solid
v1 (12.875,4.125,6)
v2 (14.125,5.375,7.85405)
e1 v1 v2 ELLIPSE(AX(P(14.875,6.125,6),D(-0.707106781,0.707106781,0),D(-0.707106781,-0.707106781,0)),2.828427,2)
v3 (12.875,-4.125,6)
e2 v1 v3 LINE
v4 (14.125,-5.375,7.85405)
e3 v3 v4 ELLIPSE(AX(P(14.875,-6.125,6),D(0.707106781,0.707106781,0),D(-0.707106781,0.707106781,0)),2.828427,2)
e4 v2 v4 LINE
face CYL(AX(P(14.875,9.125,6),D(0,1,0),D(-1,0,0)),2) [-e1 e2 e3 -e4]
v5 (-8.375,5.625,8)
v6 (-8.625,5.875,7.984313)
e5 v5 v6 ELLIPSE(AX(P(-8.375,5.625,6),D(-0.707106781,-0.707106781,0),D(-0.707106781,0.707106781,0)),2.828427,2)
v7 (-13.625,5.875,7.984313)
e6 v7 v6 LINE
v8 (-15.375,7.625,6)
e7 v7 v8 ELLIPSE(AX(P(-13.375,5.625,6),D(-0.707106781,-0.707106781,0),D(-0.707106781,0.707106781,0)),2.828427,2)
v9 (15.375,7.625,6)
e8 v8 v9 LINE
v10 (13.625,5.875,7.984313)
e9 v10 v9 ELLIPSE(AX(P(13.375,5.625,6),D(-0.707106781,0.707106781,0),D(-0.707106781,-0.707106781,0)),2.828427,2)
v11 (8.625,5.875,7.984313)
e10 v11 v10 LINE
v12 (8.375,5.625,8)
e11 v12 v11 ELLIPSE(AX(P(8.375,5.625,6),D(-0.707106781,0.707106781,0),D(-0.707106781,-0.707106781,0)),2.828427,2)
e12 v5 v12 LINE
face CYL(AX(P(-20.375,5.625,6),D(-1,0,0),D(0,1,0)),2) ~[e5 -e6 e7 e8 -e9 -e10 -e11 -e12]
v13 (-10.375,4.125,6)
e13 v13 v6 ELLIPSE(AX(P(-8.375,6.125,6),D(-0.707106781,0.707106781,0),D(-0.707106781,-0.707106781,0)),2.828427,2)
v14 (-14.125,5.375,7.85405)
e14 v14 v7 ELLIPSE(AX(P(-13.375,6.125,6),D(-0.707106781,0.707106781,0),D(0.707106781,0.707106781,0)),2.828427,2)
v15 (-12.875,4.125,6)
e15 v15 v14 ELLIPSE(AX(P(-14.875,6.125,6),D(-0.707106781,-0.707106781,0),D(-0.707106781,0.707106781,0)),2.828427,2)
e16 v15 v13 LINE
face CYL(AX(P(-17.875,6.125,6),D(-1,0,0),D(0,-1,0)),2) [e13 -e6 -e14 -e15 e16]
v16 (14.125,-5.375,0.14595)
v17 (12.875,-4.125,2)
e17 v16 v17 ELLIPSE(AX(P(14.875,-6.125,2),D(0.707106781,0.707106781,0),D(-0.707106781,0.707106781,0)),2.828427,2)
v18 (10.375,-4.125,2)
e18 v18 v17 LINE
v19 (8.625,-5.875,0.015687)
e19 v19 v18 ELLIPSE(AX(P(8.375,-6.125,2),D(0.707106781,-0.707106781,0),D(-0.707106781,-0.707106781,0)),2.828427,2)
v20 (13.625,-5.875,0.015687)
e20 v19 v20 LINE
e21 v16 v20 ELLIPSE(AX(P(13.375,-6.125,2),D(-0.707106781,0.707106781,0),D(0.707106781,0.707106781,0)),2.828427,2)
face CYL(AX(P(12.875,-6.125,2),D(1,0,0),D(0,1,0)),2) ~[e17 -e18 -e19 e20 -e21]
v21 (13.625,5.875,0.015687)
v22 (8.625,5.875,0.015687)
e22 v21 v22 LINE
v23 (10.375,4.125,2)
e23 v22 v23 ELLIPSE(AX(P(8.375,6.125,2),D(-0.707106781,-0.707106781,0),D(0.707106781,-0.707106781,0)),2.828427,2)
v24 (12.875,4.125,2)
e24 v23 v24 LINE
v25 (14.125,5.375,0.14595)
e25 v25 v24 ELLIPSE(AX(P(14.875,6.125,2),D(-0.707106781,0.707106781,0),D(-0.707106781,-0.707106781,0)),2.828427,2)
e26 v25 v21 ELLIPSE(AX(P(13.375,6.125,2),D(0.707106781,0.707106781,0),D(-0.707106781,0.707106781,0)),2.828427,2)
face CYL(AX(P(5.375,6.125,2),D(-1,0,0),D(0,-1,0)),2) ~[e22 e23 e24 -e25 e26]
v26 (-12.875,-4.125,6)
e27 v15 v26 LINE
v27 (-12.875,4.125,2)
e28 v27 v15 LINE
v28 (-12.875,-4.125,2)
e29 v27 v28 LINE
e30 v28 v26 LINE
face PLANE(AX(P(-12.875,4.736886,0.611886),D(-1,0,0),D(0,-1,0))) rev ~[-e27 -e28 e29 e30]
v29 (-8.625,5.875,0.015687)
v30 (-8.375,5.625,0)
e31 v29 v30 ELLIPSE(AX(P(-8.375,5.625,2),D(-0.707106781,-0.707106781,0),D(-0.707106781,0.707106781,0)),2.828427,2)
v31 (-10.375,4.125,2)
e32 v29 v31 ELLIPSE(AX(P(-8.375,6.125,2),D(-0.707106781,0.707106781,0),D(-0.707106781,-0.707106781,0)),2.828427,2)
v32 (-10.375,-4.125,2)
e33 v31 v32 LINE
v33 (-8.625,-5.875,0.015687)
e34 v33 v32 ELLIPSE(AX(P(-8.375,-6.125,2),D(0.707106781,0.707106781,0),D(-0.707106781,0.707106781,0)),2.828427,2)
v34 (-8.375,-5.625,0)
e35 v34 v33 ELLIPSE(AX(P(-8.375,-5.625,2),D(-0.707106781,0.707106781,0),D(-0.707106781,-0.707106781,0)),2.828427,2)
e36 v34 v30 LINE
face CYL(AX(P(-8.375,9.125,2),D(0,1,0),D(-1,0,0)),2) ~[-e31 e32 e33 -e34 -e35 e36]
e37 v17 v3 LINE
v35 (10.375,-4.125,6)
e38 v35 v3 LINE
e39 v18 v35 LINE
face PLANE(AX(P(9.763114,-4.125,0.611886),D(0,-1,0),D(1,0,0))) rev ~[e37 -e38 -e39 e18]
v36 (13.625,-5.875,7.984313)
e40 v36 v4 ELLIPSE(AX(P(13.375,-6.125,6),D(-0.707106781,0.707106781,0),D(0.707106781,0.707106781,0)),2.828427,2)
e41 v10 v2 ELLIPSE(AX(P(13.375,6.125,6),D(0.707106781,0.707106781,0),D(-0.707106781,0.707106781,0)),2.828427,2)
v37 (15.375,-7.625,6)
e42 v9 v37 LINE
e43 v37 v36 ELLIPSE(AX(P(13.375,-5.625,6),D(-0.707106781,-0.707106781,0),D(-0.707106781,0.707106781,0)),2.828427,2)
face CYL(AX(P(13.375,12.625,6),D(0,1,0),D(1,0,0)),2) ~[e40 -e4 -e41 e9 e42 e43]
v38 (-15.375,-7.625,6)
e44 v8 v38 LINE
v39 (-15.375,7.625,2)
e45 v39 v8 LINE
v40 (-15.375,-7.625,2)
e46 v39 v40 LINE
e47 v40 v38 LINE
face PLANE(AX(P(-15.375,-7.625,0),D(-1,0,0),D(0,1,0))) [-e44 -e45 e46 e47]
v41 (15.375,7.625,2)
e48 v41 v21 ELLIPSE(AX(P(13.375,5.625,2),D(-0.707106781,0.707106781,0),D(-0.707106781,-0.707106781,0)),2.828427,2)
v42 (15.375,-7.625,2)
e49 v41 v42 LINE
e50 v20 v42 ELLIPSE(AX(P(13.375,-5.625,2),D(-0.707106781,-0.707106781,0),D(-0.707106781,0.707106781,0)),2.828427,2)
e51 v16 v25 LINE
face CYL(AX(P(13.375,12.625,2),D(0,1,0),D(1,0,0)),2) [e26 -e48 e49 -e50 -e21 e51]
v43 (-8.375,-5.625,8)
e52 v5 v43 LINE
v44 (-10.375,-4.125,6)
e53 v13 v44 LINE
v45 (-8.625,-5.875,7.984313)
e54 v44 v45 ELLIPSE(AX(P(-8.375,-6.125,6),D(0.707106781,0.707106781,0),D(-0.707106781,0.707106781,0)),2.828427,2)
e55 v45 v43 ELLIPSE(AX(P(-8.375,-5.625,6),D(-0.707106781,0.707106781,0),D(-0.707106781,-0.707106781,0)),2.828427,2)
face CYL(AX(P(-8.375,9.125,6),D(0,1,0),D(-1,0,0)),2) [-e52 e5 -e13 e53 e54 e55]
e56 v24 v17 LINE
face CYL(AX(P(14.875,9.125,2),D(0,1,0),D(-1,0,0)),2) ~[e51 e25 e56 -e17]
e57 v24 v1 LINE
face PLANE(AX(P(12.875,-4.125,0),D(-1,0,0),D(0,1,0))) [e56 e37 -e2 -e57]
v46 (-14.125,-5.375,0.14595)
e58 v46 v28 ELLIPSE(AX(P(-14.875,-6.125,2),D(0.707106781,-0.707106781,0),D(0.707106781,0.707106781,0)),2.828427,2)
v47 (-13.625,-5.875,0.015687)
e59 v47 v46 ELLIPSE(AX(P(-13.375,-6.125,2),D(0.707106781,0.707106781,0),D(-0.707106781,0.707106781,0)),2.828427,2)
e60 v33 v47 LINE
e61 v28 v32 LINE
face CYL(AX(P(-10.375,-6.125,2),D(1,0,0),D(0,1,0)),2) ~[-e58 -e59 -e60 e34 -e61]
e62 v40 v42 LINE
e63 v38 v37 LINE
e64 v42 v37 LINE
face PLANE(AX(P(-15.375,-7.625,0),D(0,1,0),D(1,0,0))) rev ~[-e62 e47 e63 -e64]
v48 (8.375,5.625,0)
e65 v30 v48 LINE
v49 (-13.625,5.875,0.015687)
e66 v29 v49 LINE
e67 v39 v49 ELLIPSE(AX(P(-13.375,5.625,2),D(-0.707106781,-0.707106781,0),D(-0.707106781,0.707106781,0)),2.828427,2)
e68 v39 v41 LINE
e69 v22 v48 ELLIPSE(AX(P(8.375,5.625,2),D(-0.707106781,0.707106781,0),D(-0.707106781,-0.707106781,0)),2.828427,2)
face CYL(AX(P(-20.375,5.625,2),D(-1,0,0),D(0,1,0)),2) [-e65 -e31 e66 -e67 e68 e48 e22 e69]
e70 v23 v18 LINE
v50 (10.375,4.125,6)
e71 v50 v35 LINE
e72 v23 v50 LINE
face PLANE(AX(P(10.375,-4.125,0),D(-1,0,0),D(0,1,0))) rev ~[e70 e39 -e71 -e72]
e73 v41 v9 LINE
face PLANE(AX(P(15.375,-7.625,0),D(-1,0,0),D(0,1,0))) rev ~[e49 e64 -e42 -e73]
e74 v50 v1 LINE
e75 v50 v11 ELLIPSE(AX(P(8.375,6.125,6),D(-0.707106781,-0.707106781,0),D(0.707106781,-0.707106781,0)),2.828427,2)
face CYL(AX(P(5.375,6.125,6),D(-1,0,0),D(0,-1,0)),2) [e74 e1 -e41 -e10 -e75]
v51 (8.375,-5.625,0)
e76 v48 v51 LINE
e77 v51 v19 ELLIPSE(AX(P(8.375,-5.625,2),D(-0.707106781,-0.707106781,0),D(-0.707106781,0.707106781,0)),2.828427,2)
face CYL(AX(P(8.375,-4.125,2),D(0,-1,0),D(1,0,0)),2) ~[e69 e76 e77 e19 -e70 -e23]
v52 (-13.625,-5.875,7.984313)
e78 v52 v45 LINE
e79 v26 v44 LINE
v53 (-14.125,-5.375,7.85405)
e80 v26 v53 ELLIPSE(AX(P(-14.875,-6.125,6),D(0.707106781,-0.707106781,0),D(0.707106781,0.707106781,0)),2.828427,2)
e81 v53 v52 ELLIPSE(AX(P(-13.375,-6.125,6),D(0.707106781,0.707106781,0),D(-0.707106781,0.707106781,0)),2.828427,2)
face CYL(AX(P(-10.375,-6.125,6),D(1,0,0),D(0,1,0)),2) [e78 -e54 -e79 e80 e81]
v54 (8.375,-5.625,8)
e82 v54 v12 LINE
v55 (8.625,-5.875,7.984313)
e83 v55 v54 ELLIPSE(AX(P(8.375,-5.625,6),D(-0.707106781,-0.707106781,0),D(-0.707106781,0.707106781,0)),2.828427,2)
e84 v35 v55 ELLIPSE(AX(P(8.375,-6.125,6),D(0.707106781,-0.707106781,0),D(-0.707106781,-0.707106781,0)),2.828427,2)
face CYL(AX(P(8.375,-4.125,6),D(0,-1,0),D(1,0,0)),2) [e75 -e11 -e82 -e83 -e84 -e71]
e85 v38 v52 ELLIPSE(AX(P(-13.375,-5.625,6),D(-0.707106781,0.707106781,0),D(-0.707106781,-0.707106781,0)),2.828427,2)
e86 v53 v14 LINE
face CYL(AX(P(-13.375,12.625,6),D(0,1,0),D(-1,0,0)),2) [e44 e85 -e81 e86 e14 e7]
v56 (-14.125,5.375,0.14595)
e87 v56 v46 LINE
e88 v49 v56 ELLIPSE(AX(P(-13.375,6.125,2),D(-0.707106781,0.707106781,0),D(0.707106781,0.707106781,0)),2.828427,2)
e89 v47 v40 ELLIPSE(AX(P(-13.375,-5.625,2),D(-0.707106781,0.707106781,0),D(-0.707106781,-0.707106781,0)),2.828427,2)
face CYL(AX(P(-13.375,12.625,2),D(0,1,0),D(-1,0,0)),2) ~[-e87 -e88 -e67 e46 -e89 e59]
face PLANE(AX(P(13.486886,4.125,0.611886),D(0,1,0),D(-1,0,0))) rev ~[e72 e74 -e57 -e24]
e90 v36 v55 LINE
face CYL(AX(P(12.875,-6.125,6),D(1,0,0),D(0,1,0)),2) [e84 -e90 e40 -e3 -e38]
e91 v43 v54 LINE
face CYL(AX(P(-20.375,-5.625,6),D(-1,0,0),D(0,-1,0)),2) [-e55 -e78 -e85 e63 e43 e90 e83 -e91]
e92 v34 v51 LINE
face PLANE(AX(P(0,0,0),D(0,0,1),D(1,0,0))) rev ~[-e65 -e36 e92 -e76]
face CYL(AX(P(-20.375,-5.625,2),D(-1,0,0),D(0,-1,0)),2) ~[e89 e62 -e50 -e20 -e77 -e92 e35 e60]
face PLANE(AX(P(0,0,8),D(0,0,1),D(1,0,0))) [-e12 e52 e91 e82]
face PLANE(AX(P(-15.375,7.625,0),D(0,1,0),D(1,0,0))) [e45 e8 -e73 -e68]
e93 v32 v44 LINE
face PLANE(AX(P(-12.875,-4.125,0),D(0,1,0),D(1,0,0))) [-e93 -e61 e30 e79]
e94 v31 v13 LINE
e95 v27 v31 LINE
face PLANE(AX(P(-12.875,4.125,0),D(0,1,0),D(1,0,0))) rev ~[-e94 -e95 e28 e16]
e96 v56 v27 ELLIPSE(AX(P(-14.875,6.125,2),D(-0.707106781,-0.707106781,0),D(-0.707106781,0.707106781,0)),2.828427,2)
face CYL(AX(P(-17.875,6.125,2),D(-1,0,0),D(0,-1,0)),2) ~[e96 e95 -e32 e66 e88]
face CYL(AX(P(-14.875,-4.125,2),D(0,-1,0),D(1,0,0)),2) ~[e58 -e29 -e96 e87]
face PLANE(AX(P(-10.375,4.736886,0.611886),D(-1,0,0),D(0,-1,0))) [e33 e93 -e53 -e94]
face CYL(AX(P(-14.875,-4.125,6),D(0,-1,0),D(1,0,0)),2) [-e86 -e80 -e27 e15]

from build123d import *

# Parameters (mm, degrees)
F0_W          = 30.75
F0_H          = 15.25
F0_W_2        = 2.5
F0_H_2        = 8.25
F1_DEPTH      = 8
F2_T1_DEPTH   = 40.75
F2_T3_DEPTH   = 25.25
F2_T5_DEPTH   = 2.5
F2_T7_DEPTH   = 8.25
F2_T9_DEPTH   = 2.5
F2_T15_DEPTH  = 7.5
F2_T20_DEPTH  = 13.25
F2_T28_DEPTH  = 7.5
F2_T32_DEPTH  = 13.25
F2_T40_DEPTH  = 13.25
F2_T45_DEPTH  = 7.5
F2_T52_DEPTH  = 7.5
F2_T57_DEPTH  = 13.25
F2_T65_DEPTH  = 13.25
F2_T70_DEPTH  = 7.5
F2_T77_DEPTH  = 13.25
F2_T82_DEPTH  = 7.5
F2_T89_DEPTH  = 7.5
F2_T94_DEPTH  = 13.25
F2_T102_DEPTH = 13.25
F2_T107_DEPTH = 7.5
F2_T115_DEPTH = 7.5
F2_T120_DEPTH = 13.25
F2_T128_DEPTH = 7.5
F2_T132_DEPTH = 13.25
F2_T140_DEPTH = 13.25
F2_T145_DEPTH = 7.5
F2_T152_DEPTH = 7.5
F2_T157_DEPTH = 13.25
F2_T165_DEPTH = 13.25
F2_T170_DEPTH = 7.5
F2_T177_DEPTH = 13.25
F2_T182_DEPTH = 7.5
F2_T189_DEPTH = 7.5
F2_T194_DEPTH = 13.25
F2_T202_DEPTH = 13.25
F2_T207_DEPTH = 7.5


# Not quite as in the source:
# - a fillet or chamfer that OpenCascade refuses, or shapes differently, is made with other operations: its cross-section is extruded or revolved along the edge and cut away or added


with BuildPart() as f1:
    # F0 (on Top) → F1 (new body)
    with BuildSketch(Plane.XY):
        Rectangle(F0_W, F0_H)
        with Locations((-11.625, 0)):
            Rectangle(F0_W_2, F0_H_2, mode=Mode.SUBTRACT)
        with Locations((11.625, 0)):
            Rectangle(F0_W_2, F0_H_2, mode=Mode.SUBTRACT)
    extrude(amount=F1_DEPTH)

    # F2: fillet of radius 2 on 24 edges, made by hand

    # F2_s2 → F2_t1 (cut)
    with BuildSketch(Plane.YZ.offset(-20.375)):
        with BuildLine():
            ThreePointArc((7.625, 6), (7.0392135624, 7.4142135624), (5.625, 8))
            Line((5.625, 8), (7.625, 8))
            Line((7.625, 8), (7.625, 6))
        make_face()
        with BuildLine():
            ThreePointArc((-7.625, 6), (-7.0392135624, 7.4142135624), (-5.625, 8))
            Line((-5.625, 8), (-7.625, 8))
            Line((-7.625, 8), (-7.625, 6))
        make_face()
        with BuildLine():
            ThreePointArc((7.625, 2), (7.0392135624, 0.5857864376), (5.625, 0))
            Line((5.625, 0), (7.625, 0))
            Line((7.625, 0), (7.625, 2))
        make_face()
        with BuildLine():
            ThreePointArc((-7.625, 2), (-7.0392135624, 0.5857864376), (-5.625, 0))
            Line((-5.625, 0), (-7.625, 0))
            Line((-7.625, 0), (-7.625, 2))
        make_face()
    extrude(amount=F2_T1_DEPTH, mode=Mode.SUBTRACT)

    # F2_s4 → F2_t3 (cut)
    with BuildSketch(Plane.XZ.offset(-12.625)):
        with BuildLine():
            ThreePointArc((-15.375, 6), (-14.7892135624, 7.4142135624), (-13.375, 8))
            Line((-13.375, 8), (-15.375, 8))
            Line((-15.375, 8), (-15.375, 6))
        make_face()
        with BuildLine():
            ThreePointArc((15.375, 6), (14.7892135624, 7.4142135624), (13.375, 8))
            Line((13.375, 8), (15.375, 8))
            Line((15.375, 8), (15.375, 6))
        make_face()
        with BuildLine():
            ThreePointArc((-15.375, 2), (-14.7892135624, 0.5857864376), (-13.375, 0))
            Line((-13.375, 0), (-15.375, 0))
            Line((-15.375, 0), (-15.375, 2))
        make_face()
        with BuildLine():
            ThreePointArc((15.375, 2), (14.7892135624, 0.5857864376), (13.375, 0))
            Line((13.375, 0), (15.375, 0))
            Line((15.375, 0), (15.375, 2))
        make_face()
    extrude(amount=F2_T3_DEPTH, mode=Mode.SUBTRACT)

    # F2_s6 → F2_t5 (cut)
    with BuildSketch(Plane.YZ.offset(-12.875)):
        with BuildLine():
            ThreePointArc((4.125, 6), (4.7107864376, 7.4142135624), (6.125, 8))
            Line((6.125, 8), (4.125, 8))
            Line((4.125, 8), (4.125, 6))
        make_face()
        with BuildLine():
            ThreePointArc((-4.125, 6), (-4.7107864376, 7.4142135624), (-6.125, 8))
            Line((-6.125, 8), (-4.125, 8))
            Line((-4.125, 8), (-4.125, 6))
        make_face()
        with BuildLine():
            ThreePointArc((4.125, 2), (4.7107864376, 0.5857864376), (6.125, 0))
            Line((6.125, 0), (4.125, 0))
            Line((4.125, 0), (4.125, 2))
        make_face()
        with BuildLine():
            ThreePointArc((-4.125, 2), (-4.7107864376, 0.5857864376), (-6.125, 0))
            Line((-6.125, 0), (-4.125, 0))
            Line((-4.125, 0), (-4.125, 2))
        make_face()
    extrude(amount=F2_T5_DEPTH, mode=Mode.SUBTRACT)

    # F2_s8 → F2_t7 (cut)
    with BuildSketch(Plane.XZ.offset(-4.125)):
        with BuildLine():
            ThreePointArc((-10.375, 6), (-9.7892135624, 7.4142135624), (-8.375, 8))
            Line((-8.375, 8), (-10.375, 8))
            Line((-10.375, 8), (-10.375, 6))
        make_face()
        with BuildLine():
            ThreePointArc((-12.875, 6), (-13.4607864376, 7.4142135624), (-14.875, 8))
            Line((-14.875, 8), (-12.875, 8))
            Line((-12.875, 8), (-12.875, 6))
        make_face()
        with BuildLine():
            ThreePointArc((10.375, 6), (9.7892135624, 7.4142135624), (8.375, 8))
            Line((8.375, 8), (10.375, 8))
            Line((10.375, 8), (10.375, 6))
        make_face()
        with BuildLine():
            ThreePointArc((12.875, 6), (13.4607864376, 7.4142135624), (14.875, 8))
            Line((14.875, 8), (12.875, 8))
            Line((12.875, 8), (12.875, 6))
        make_face()
        with BuildLine():
            ThreePointArc((-10.375, 2), (-9.7892135624, 0.5857864376), (-8.375, 0))
            Line((-8.375, 0), (-10.375, 0))
            Line((-10.375, 0), (-10.375, 2))
        make_face()
        with BuildLine():
            ThreePointArc((-12.875, 2), (-13.4607864376, 0.5857864376), (-14.875, 0))
            Line((-14.875, 0), (-12.875, 0))
            Line((-12.875, 0), (-12.875, 2))
        make_face()
        with BuildLine():
            ThreePointArc((10.375, 2), (9.7892135624, 0.5857864376), (8.375, 0))
            Line((8.375, 0), (10.375, 0))
            Line((10.375, 0), (10.375, 2))
        make_face()
        with BuildLine():
            ThreePointArc((12.875, 2), (13.4607864376, 0.5857864376), (14.875, 0))
            Line((14.875, 0), (12.875, 0))
            Line((12.875, 0), (12.875, 2))
        make_face()
    extrude(amount=F2_T7_DEPTH, mode=Mode.SUBTRACT)

    # F2_s10 → F2_t9 (cut)
    with BuildSketch(Plane.YZ.offset(10.375)):
        with BuildLine():
            ThreePointArc((4.125, 6), (4.7107864376, 7.4142135624), (6.125, 8))
            Line((6.125, 8), (4.125, 8))
            Line((4.125, 8), (4.125, 6))
        make_face()
        with BuildLine():
            ThreePointArc((-4.125, 6), (-4.7107864376, 7.4142135624), (-6.125, 8))
            Line((-6.125, 8), (-4.125, 8))
            Line((-4.125, 8), (-4.125, 6))
        make_face()
        with BuildLine():
            ThreePointArc((4.125, 2), (4.7107864376, 0.5857864376), (6.125, 0))
            Line((6.125, 0), (4.125, 0))
            Line((4.125, 0), (4.125, 2))
        make_face()
        with BuildLine():
            ThreePointArc((-4.125, 2), (-4.7107864376, 0.5857864376), (-6.125, 0))
            Line((-6.125, 0), (-4.125, 0))
            Line((-4.125, 0), (-4.125, 2))
        make_face()
    extrude(amount=F2_T9_DEPTH, mode=Mode.SUBTRACT)


with BuildPart() as f2_tool13:
    # F2_s14 → F2_t15 (new body)
    with BuildSketch(Plane.YZ.offset(-17.875)):
        with BuildLine():
            ThreePointArc((4.125, 6), (4.7107864376, 7.4142135624), (6.125, 8))
            Line((6.125, 8), (4.125, 8))
            Line((4.125, 8), (4.125, 6))
        make_face()
    extrude(amount=F2_T15_DEPTH)

    split(bisect_by=Plane.YZ.offset(-15.375), keep=Keep.TOP)

    split(bisect_by=Plane.YZ.offset(-12.875), keep=Keep.BOTTOM)


with BuildPart() as f2_tool18:
    # F2_s19 → F2_t20 (new body)
    with BuildSketch(Plane.XZ.offset(4.125)):
        with BuildLine():
            ThreePointArc((-12.875, 6), (-13.4607864376, 7.4142135624), (-14.875, 8))
            Line((-14.875, 8), (-12.875, 8))
            Line((-12.875, 8), (-12.875, 6))
        make_face()
    extrude(amount=-F2_T20_DEPTH)

    split(bisect_by=Plane.XZ.offset(-7.625), keep=Keep.TOP)

    split(bisect_by=Plane.XZ.offset(-4.125), keep=Keep.BOTTOM)


with BuildPart() as f2_tool13_1:
    add(f2_tool13.part)

    # F2_t23: intersect F2_tool18
    add(f2_tool18.part, mode=Mode.INTERSECT)


with BuildPart() as f1_1:
    add(f1.part)

    # F2_t11: cut F2_tool13
    add(f2_tool13_1.part, mode=Mode.SUBTRACT)


with BuildPart() as f2_tool26:
    # F2_s27 → F2_t28 (new body)
    with BuildSketch(Plane.YZ.offset(-12.875)):
        with BuildLine():
            ThreePointArc((4.125, 6), (4.7107864376, 7.4142135624), (6.125, 8))
            Line((6.125, 8), (4.125, 8))
            Line((4.125, 8), (4.125, 6))
        make_face()
    extrude(amount=F2_T28_DEPTH)

    split(bisect_by=Plane.YZ.offset(-10.375), keep=Keep.TOP)


with BuildPart() as f2_tool30:
    # F2_s31 → F2_t32 (new body)
    with BuildSketch(Plane.XZ.offset(-9.125)):
        with BuildLine():
            ThreePointArc((-10.375, 6), (-9.7892135624, 7.4142135624), (-8.375, 8))
            Line((-8.375, 8), (-10.375, 8))
            Line((-10.375, 8), (-10.375, 6))
        make_face()
    extrude(amount=F2_T32_DEPTH)

    split(bisect_by=Plane.XZ.offset(-7.625), keep=Keep.TOP)

    split(bisect_by=Plane.XZ.offset(-4.125), keep=Keep.BOTTOM)


with BuildPart() as f2_tool26_1:
    add(f2_tool26.part)

    # F2_t35: intersect F2_tool30
    add(f2_tool30.part, mode=Mode.INTERSECT)


with BuildPart() as f1_2:
    add(f1_1.part)

    # F2_t24: cut F2_tool26
    add(f2_tool26_1.part, mode=Mode.SUBTRACT)


with BuildPart() as f2_tool38:
    # F2_s39 → F2_t40 (new body)
    with BuildSketch(Plane.XZ.offset(-4.125)):
        with BuildLine():
            ThreePointArc((-10.375, 6), (-9.7892135624, 7.4142135624), (-8.375, 8))
            Line((-8.375, 8), (-10.375, 8))
            Line((-10.375, 8), (-10.375, 6))
        make_face()
    extrude(amount=F2_T40_DEPTH)

    split(bisect_by=Plane.XZ.offset(7.625), keep=Keep.BOTTOM)

    split(bisect_by=Plane.XZ.offset(4.125), keep=Keep.TOP)


with BuildPart() as f2_tool43:
    # F2_s44 → F2_t45 (new body)
    with BuildSketch(Plane.YZ.offset(-5.375)):
        with BuildLine():
            ThreePointArc((-4.125, 6), (-4.7107864376, 7.4142135624), (-6.125, 8))
            Line((-6.125, 8), (-4.125, 8))
            Line((-4.125, 8), (-4.125, 6))
        make_face()
    extrude(amount=-F2_T45_DEPTH)

    split(bisect_by=Plane.YZ.offset(-10.375), keep=Keep.TOP)


with BuildPart() as f2_tool38_1:
    add(f2_tool38.part)

    # F2_t47: intersect F2_tool43
    add(f2_tool43.part, mode=Mode.INTERSECT)


with BuildPart() as f1_3:
    add(f1_2.part)

    # F2_t36: cut F2_tool38
    add(f2_tool38_1.part, mode=Mode.SUBTRACT)


with BuildPart() as f2_tool50:
    # F2_s51 → F2_t52 (new body)
    with BuildSketch(Plane.YZ.offset(-10.375)):
        with BuildLine():
            ThreePointArc((-4.125, 6), (-4.7107864376, 7.4142135624), (-6.125, 8))
            Line((-6.125, 8), (-4.125, 8))
            Line((-4.125, 8), (-4.125, 6))
        make_face()
    extrude(amount=-F2_T52_DEPTH)

    split(bisect_by=Plane.YZ.offset(-15.375), keep=Keep.TOP)

    split(bisect_by=Plane.YZ.offset(-12.875), keep=Keep.BOTTOM)


with BuildPart() as f2_tool55:
    # F2_s56 → F2_t57 (new body)
    with BuildSketch(Plane.XZ.offset(9.125)):
        with BuildLine():
            ThreePointArc((-12.875, 6), (-13.4607864376, 7.4142135624), (-14.875, 8))
            Line((-14.875, 8), (-12.875, 8))
            Line((-12.875, 8), (-12.875, 6))
        make_face()
    extrude(amount=-F2_T57_DEPTH)

    split(bisect_by=Plane.XZ.offset(7.625), keep=Keep.BOTTOM)

    split(bisect_by=Plane.XZ.offset(4.125), keep=Keep.TOP)


with BuildPart() as f2_tool50_1:
    add(f2_tool50.part)

    # F2_t60: intersect F2_tool55
    add(f2_tool55.part, mode=Mode.INTERSECT)


with BuildPart() as f1_4:
    add(f1_3.part)

    # F2_t48: cut F2_tool50
    add(f2_tool50_1.part, mode=Mode.SUBTRACT)


with BuildPart() as f2_tool63:
    # F2_s64 → F2_t65 (new body)
    with BuildSketch(Plane.XZ.offset(9.125)):
        with BuildLine():
            ThreePointArc((10.375, 6), (9.7892135624, 7.4142135624), (8.375, 8))
            Line((8.375, 8), (10.375, 8))
            Line((10.375, 8), (10.375, 6))
        make_face()
    extrude(amount=-F2_T65_DEPTH)

    split(bisect_by=Plane.XZ.offset(7.625), keep=Keep.BOTTOM)

    split(bisect_by=Plane.XZ.offset(4.125), keep=Keep.TOP)


with BuildPart() as f2_tool68:
    # F2_s69 → F2_t70 (new body)
    with BuildSketch(Plane.YZ.offset(12.875)):
        with BuildLine():
            ThreePointArc((-4.125, 6), (-4.7107864376, 7.4142135624), (-6.125, 8))
            Line((-6.125, 8), (-4.125, 8))
            Line((-4.125, 8), (-4.125, 6))
        make_face()
    extrude(amount=-F2_T70_DEPTH)

    split(bisect_by=Plane.YZ.offset(10.375), keep=Keep.BOTTOM)


with BuildPart() as f2_tool63_1:
    add(f2_tool63.part)

    # F2_t72: intersect F2_tool68
    add(f2_tool68.part, mode=Mode.INTERSECT)


with BuildPart() as f1_5:
    add(f1_4.part)

    # F2_t61: cut F2_tool63
    add(f2_tool63_1.part, mode=Mode.SUBTRACT)


with BuildPart() as f2_tool75:
    # F2_s76 → F2_t77 (new body)
    with BuildSketch(Plane.XZ.offset(4.125)):
        with BuildLine():
            ThreePointArc((10.375, 6), (9.7892135624, 7.4142135624), (8.375, 8))
            Line((8.375, 8), (10.375, 8))
            Line((10.375, 8), (10.375, 6))
        make_face()
    extrude(amount=-F2_T77_DEPTH)

    split(bisect_by=Plane.XZ.offset(-7.625), keep=Keep.TOP)

    split(bisect_by=Plane.XZ.offset(-4.125), keep=Keep.BOTTOM)


with BuildPart() as f2_tool80:
    # F2_s81 → F2_t82 (new body)
    with BuildSketch(Plane.YZ.offset(5.375)):
        with BuildLine():
            ThreePointArc((4.125, 6), (4.7107864376, 7.4142135624), (6.125, 8))
            Line((6.125, 8), (4.125, 8))
            Line((4.125, 8), (4.125, 6))
        make_face()
    extrude(amount=F2_T82_DEPTH)

    split(bisect_by=Plane.YZ.offset(10.375), keep=Keep.BOTTOM)


with BuildPart() as f2_tool75_1:
    add(f2_tool75.part)

    # F2_t84: intersect F2_tool80
    add(f2_tool80.part, mode=Mode.INTERSECT)


with BuildPart() as f1_6:
    add(f1_5.part)

    # F2_t73: cut F2_tool75
    add(f2_tool75_1.part, mode=Mode.SUBTRACT)


with BuildPart() as f2_tool87:
    # F2_s88 → F2_t89 (new body)
    with BuildSketch(Plane.YZ.offset(10.375)):
        with BuildLine():
            ThreePointArc((4.125, 6), (4.7107864376, 7.4142135624), (6.125, 8))
            Line((6.125, 8), (4.125, 8))
            Line((4.125, 8), (4.125, 6))
        make_face()
    extrude(amount=F2_T89_DEPTH)

    split(bisect_by=Plane.YZ.offset(15.375), keep=Keep.BOTTOM)

    split(bisect_by=Plane.YZ.offset(12.875), keep=Keep.TOP)


with BuildPart() as f2_tool92:
    # F2_s93 → F2_t94 (new body)
    with BuildSketch(Plane.XZ.offset(-9.125)):
        with BuildLine():
            ThreePointArc((12.875, 6), (13.4607864376, 7.4142135624), (14.875, 8))
            Line((14.875, 8), (12.875, 8))
            Line((12.875, 8), (12.875, 6))
        make_face()
    extrude(amount=F2_T94_DEPTH)

    split(bisect_by=Plane.XZ.offset(-7.625), keep=Keep.TOP)

    split(bisect_by=Plane.XZ.offset(-4.125), keep=Keep.BOTTOM)


with BuildPart() as f2_tool87_1:
    add(f2_tool87.part)

    # F2_t97: intersect F2_tool92
    add(f2_tool92.part, mode=Mode.INTERSECT)


with BuildPart() as f1_7:
    add(f1_6.part)

    # F2_t85: cut F2_tool87
    add(f2_tool87_1.part, mode=Mode.SUBTRACT)


with BuildPart() as f2_tool100:
    # F2_s101 → F2_t102 (new body)
    with BuildSketch(Plane.XZ.offset(-4.125)):
        with BuildLine():
            ThreePointArc((12.875, 6), (13.4607864376, 7.4142135624), (14.875, 8))
            Line((14.875, 8), (12.875, 8))
            Line((12.875, 8), (12.875, 6))
        make_face()
    extrude(amount=F2_T102_DEPTH)

    split(bisect_by=Plane.XZ.offset(7.625), keep=Keep.BOTTOM)

    split(bisect_by=Plane.XZ.offset(4.125), keep=Keep.TOP)


with BuildPart() as f2_tool105:
    # F2_s106 → F2_t107 (new body)
    with BuildSketch(Plane.YZ.offset(17.875)):
        with BuildLine():
            ThreePointArc((-4.125, 6), (-4.7107864376, 7.4142135624), (-6.125, 8))
            Line((-6.125, 8), (-4.125, 8))
            Line((-4.125, 8), (-4.125, 6))
        make_face()
    extrude(amount=-F2_T107_DEPTH)

    split(bisect_by=Plane.YZ.offset(15.375), keep=Keep.BOTTOM)

    split(bisect_by=Plane.YZ.offset(12.875), keep=Keep.TOP)


with BuildPart() as f2_tool100_1:
    add(f2_tool100.part)

    # F2_t110: intersect F2_tool105
    add(f2_tool105.part, mode=Mode.INTERSECT)


with BuildPart() as f1_8:
    add(f1_7.part)

    # F2_t98: cut F2_tool100
    add(f2_tool100_1.part, mode=Mode.SUBTRACT)


with BuildPart() as f2_tool113:
    # F2_s114 → F2_t115 (new body)
    with BuildSketch(Plane.YZ.offset(-17.875)):
        with BuildLine():
            ThreePointArc((4.125, 2), (4.7107864376, 0.5857864376), (6.125, 0))
            Line((6.125, 0), (4.125, 0))
            Line((4.125, 0), (4.125, 2))
        make_face()
    extrude(amount=F2_T115_DEPTH)

    split(bisect_by=Plane.YZ.offset(-15.375), keep=Keep.TOP)

    split(bisect_by=Plane.YZ.offset(-12.875), keep=Keep.BOTTOM)


with BuildPart() as f2_tool118:
    # F2_s119 → F2_t120 (new body)
    with BuildSketch(Plane.XZ.offset(4.125)):
        with BuildLine():
            ThreePointArc((-12.875, 2), (-13.4607864376, 0.5857864376), (-14.875, 0))
            Line((-14.875, 0), (-12.875, 0))
            Line((-12.875, 0), (-12.875, 2))
        make_face()
    extrude(amount=-F2_T120_DEPTH)

    split(bisect_by=Plane.XZ.offset(-7.625), keep=Keep.TOP)

    split(bisect_by=Plane.XZ.offset(-4.125), keep=Keep.BOTTOM)


with BuildPart() as f2_tool113_1:
    add(f2_tool113.part)

    # F2_t123: intersect F2_tool118
    add(f2_tool118.part, mode=Mode.INTERSECT)


with BuildPart() as f1_9:
    add(f1_8.part)

    # F2_t111: cut F2_tool113
    add(f2_tool113_1.part, mode=Mode.SUBTRACT)


with BuildPart() as f2_tool126:
    # F2_s127 → F2_t128 (new body)
    with BuildSketch(Plane.YZ.offset(-12.875)):
        with BuildLine():
            ThreePointArc((4.125, 2), (4.7107864376, 0.5857864376), (6.125, 0))
            Line((6.125, 0), (4.125, 0))
            Line((4.125, 0), (4.125, 2))
        make_face()
    extrude(amount=F2_T128_DEPTH)

    split(bisect_by=Plane.YZ.offset(-10.375), keep=Keep.TOP)


with BuildPart() as f2_tool130:
    # F2_s131 → F2_t132 (new body)
    with BuildSketch(Plane.XZ.offset(-9.125)):
        with BuildLine():
            ThreePointArc((-10.375, 2), (-9.7892135624, 0.5857864376), (-8.375, 0))
            Line((-8.375, 0), (-10.375, 0))
            Line((-10.375, 0), (-10.375, 2))
        make_face()
    extrude(amount=F2_T132_DEPTH)

    split(bisect_by=Plane.XZ.offset(-7.625), keep=Keep.TOP)

    split(bisect_by=Plane.XZ.offset(-4.125), keep=Keep.BOTTOM)


with BuildPart() as f2_tool126_1:
    add(f2_tool126.part)

    # F2_t135: intersect F2_tool130
    add(f2_tool130.part, mode=Mode.INTERSECT)


with BuildPart() as f1_10:
    add(f1_9.part)

    # F2_t124: cut F2_tool126
    add(f2_tool126_1.part, mode=Mode.SUBTRACT)


with BuildPart() as f2_tool138:
    # F2_s139 → F2_t140 (new body)
    with BuildSketch(Plane.XZ.offset(-4.125)):
        with BuildLine():
            ThreePointArc((-10.375, 2), (-9.7892135624, 0.5857864376), (-8.375, 0))
            Line((-8.375, 0), (-10.375, 0))
            Line((-10.375, 0), (-10.375, 2))
        make_face()
    extrude(amount=F2_T140_DEPTH)

    split(bisect_by=Plane.XZ.offset(7.625), keep=Keep.BOTTOM)

    split(bisect_by=Plane.XZ.offset(4.125), keep=Keep.TOP)


with BuildPart() as f2_tool143:
    # F2_s144 → F2_t145 (new body)
    with BuildSketch(Plane.YZ.offset(-5.375)):
        with BuildLine():
            ThreePointArc((-4.125, 2), (-4.7107864376, 0.5857864376), (-6.125, 0))
            Line((-6.125, 0), (-4.125, 0))
            Line((-4.125, 0), (-4.125, 2))
        make_face()
    extrude(amount=-F2_T145_DEPTH)

    split(bisect_by=Plane.YZ.offset(-10.375), keep=Keep.TOP)


with BuildPart() as f2_tool138_1:
    add(f2_tool138.part)

    # F2_t147: intersect F2_tool143
    add(f2_tool143.part, mode=Mode.INTERSECT)


with BuildPart() as f1_11:
    add(f1_10.part)

    # F2_t136: cut F2_tool138
    add(f2_tool138_1.part, mode=Mode.SUBTRACT)


with BuildPart() as f2_tool150:
    # F2_s151 → F2_t152 (new body)
    with BuildSketch(Plane.YZ.offset(-10.375)):
        with BuildLine():
            ThreePointArc((-4.125, 2), (-4.7107864376, 0.5857864376), (-6.125, 0))
            Line((-6.125, 0), (-4.125, 0))
            Line((-4.125, 0), (-4.125, 2))
        make_face()
    extrude(amount=-F2_T152_DEPTH)

    split(bisect_by=Plane.YZ.offset(-15.375), keep=Keep.TOP)

    split(bisect_by=Plane.YZ.offset(-12.875), keep=Keep.BOTTOM)


with BuildPart() as f2_tool155:
    # F2_s156 → F2_t157 (new body)
    with BuildSketch(Plane.XZ.offset(9.125)):
        with BuildLine():
            ThreePointArc((-12.875, 2), (-13.4607864376, 0.5857864376), (-14.875, 0))
            Line((-14.875, 0), (-12.875, 0))
            Line((-12.875, 0), (-12.875, 2))
        make_face()
    extrude(amount=-F2_T157_DEPTH)

    split(bisect_by=Plane.XZ.offset(7.625), keep=Keep.BOTTOM)

    split(bisect_by=Plane.XZ.offset(4.125), keep=Keep.TOP)


with BuildPart() as f2_tool150_1:
    add(f2_tool150.part)

    # F2_t160: intersect F2_tool155
    add(f2_tool155.part, mode=Mode.INTERSECT)


with BuildPart() as f1_12:
    add(f1_11.part)

    # F2_t148: cut F2_tool150
    add(f2_tool150_1.part, mode=Mode.SUBTRACT)


with BuildPart() as f2_tool163:
    # F2_s164 → F2_t165 (new body)
    with BuildSketch(Plane.XZ.offset(9.125)):
        with BuildLine():
            ThreePointArc((10.375, 2), (9.7892135624, 0.5857864376), (8.375, 0))
            Line((8.375, 0), (10.375, 0))
            Line((10.375, 0), (10.375, 2))
        make_face()
    extrude(amount=-F2_T165_DEPTH)

    split(bisect_by=Plane.XZ.offset(7.625), keep=Keep.BOTTOM)

    split(bisect_by=Plane.XZ.offset(4.125), keep=Keep.TOP)


with BuildPart() as f2_tool168:
    # F2_s169 → F2_t170 (new body)
    with BuildSketch(Plane.YZ.offset(12.875)):
        with BuildLine():
            ThreePointArc((-4.125, 2), (-4.7107864376, 0.5857864376), (-6.125, 0))
            Line((-6.125, 0), (-4.125, 0))
            Line((-4.125, 0), (-4.125, 2))
        make_face()
    extrude(amount=-F2_T170_DEPTH)

    split(bisect_by=Plane.YZ.offset(10.375), keep=Keep.BOTTOM)


with BuildPart() as f2_tool163_1:
    add(f2_tool163.part)

    # F2_t172: intersect F2_tool168
    add(f2_tool168.part, mode=Mode.INTERSECT)


with BuildPart() as f1_13:
    add(f1_12.part)

    # F2_t161: cut F2_tool163
    add(f2_tool163_1.part, mode=Mode.SUBTRACT)


with BuildPart() as f2_tool175:
    # F2_s176 → F2_t177 (new body)
    with BuildSketch(Plane.XZ.offset(4.125)):
        with BuildLine():
            ThreePointArc((10.375, 2), (9.7892135624, 0.5857864376), (8.375, 0))
            Line((8.375, 0), (10.375, 0))
            Line((10.375, 0), (10.375, 2))
        make_face()
    extrude(amount=-F2_T177_DEPTH)

    split(bisect_by=Plane.XZ.offset(-7.625), keep=Keep.TOP)

    split(bisect_by=Plane.XZ.offset(-4.125), keep=Keep.BOTTOM)


with BuildPart() as f2_tool180:
    # F2_s181 → F2_t182 (new body)
    with BuildSketch(Plane.YZ.offset(5.375)):
        with BuildLine():
            ThreePointArc((4.125, 2), (4.7107864376, 0.5857864376), (6.125, 0))
            Line((6.125, 0), (4.125, 0))
            Line((4.125, 0), (4.125, 2))
        make_face()
    extrude(amount=F2_T182_DEPTH)

    split(bisect_by=Plane.YZ.offset(10.375), keep=Keep.BOTTOM)


with BuildPart() as f2_tool175_1:
    add(f2_tool175.part)

    # F2_t184: intersect F2_tool180
    add(f2_tool180.part, mode=Mode.INTERSECT)


with BuildPart() as f1_14:
    add(f1_13.part)

    # F2_t173: cut F2_tool175
    add(f2_tool175_1.part, mode=Mode.SUBTRACT)


with BuildPart() as f2_tool187:
    # F2_s188 → F2_t189 (new body)
    with BuildSketch(Plane.YZ.offset(10.375)):
        with BuildLine():
            ThreePointArc((4.125, 2), (4.7107864376, 0.5857864376), (6.125, 0))
            Line((6.125, 0), (4.125, 0))
            Line((4.125, 0), (4.125, 2))
        make_face()
    extrude(amount=F2_T189_DEPTH)

    split(bisect_by=Plane.YZ.offset(15.375), keep=Keep.BOTTOM)

    split(bisect_by=Plane.YZ.offset(12.875), keep=Keep.TOP)


with BuildPart() as f2_tool192:
    # F2_s193 → F2_t194 (new body)
    with BuildSketch(Plane.XZ.offset(-9.125)):
        with BuildLine():
            ThreePointArc((12.875, 2), (13.4607864376, 0.5857864376), (14.875, 0))
            Line((14.875, 0), (12.875, 0))
            Line((12.875, 0), (12.875, 2))
        make_face()
    extrude(amount=F2_T194_DEPTH)

    split(bisect_by=Plane.XZ.offset(-7.625), keep=Keep.TOP)

    split(bisect_by=Plane.XZ.offset(-4.125), keep=Keep.BOTTOM)


with BuildPart() as f2_tool187_1:
    add(f2_tool187.part)

    # F2_t197: intersect F2_tool192
    add(f2_tool192.part, mode=Mode.INTERSECT)


with BuildPart() as f1_15:
    add(f1_14.part)

    # F2_t185: cut F2_tool187
    add(f2_tool187_1.part, mode=Mode.SUBTRACT)


with BuildPart() as f2_tool200:
    # F2_s201 → F2_t202 (new body)
    with BuildSketch(Plane.XZ.offset(-4.125)):
        with BuildLine():
            ThreePointArc((12.875, 2), (13.4607864376, 0.5857864376), (14.875, 0))
            Line((14.875, 0), (12.875, 0))
            Line((12.875, 0), (12.875, 2))
        make_face()
    extrude(amount=F2_T202_DEPTH)

    split(bisect_by=Plane.XZ.offset(7.625), keep=Keep.BOTTOM)

    split(bisect_by=Plane.XZ.offset(4.125), keep=Keep.TOP)


with BuildPart() as f2_tool205:
    # F2_s206 → F2_t207 (new body)
    with BuildSketch(Plane.YZ.offset(17.875)):
        with BuildLine():
            ThreePointArc((-4.125, 2), (-4.7107864376, 0.5857864376), (-6.125, 0))
            Line((-6.125, 0), (-4.125, 0))
            Line((-4.125, 0), (-4.125, 2))
        make_face()
    extrude(amount=-F2_T207_DEPTH)

    split(bisect_by=Plane.YZ.offset(15.375), keep=Keep.BOTTOM)

    split(bisect_by=Plane.YZ.offset(12.875), keep=Keep.TOP)


with BuildPart() as f2_tool200_1:
    add(f2_tool200.part)

    # F2_t210: intersect F2_tool205
    add(f2_tool205.part, mode=Mode.INTERSECT)


with BuildPart() as f1_16:
    add(f1_15.part)

    # F2_t198: cut F2_tool200
    add(f2_tool200_1.part, mode=Mode.SUBTRACT)


solid = f1_16.part
